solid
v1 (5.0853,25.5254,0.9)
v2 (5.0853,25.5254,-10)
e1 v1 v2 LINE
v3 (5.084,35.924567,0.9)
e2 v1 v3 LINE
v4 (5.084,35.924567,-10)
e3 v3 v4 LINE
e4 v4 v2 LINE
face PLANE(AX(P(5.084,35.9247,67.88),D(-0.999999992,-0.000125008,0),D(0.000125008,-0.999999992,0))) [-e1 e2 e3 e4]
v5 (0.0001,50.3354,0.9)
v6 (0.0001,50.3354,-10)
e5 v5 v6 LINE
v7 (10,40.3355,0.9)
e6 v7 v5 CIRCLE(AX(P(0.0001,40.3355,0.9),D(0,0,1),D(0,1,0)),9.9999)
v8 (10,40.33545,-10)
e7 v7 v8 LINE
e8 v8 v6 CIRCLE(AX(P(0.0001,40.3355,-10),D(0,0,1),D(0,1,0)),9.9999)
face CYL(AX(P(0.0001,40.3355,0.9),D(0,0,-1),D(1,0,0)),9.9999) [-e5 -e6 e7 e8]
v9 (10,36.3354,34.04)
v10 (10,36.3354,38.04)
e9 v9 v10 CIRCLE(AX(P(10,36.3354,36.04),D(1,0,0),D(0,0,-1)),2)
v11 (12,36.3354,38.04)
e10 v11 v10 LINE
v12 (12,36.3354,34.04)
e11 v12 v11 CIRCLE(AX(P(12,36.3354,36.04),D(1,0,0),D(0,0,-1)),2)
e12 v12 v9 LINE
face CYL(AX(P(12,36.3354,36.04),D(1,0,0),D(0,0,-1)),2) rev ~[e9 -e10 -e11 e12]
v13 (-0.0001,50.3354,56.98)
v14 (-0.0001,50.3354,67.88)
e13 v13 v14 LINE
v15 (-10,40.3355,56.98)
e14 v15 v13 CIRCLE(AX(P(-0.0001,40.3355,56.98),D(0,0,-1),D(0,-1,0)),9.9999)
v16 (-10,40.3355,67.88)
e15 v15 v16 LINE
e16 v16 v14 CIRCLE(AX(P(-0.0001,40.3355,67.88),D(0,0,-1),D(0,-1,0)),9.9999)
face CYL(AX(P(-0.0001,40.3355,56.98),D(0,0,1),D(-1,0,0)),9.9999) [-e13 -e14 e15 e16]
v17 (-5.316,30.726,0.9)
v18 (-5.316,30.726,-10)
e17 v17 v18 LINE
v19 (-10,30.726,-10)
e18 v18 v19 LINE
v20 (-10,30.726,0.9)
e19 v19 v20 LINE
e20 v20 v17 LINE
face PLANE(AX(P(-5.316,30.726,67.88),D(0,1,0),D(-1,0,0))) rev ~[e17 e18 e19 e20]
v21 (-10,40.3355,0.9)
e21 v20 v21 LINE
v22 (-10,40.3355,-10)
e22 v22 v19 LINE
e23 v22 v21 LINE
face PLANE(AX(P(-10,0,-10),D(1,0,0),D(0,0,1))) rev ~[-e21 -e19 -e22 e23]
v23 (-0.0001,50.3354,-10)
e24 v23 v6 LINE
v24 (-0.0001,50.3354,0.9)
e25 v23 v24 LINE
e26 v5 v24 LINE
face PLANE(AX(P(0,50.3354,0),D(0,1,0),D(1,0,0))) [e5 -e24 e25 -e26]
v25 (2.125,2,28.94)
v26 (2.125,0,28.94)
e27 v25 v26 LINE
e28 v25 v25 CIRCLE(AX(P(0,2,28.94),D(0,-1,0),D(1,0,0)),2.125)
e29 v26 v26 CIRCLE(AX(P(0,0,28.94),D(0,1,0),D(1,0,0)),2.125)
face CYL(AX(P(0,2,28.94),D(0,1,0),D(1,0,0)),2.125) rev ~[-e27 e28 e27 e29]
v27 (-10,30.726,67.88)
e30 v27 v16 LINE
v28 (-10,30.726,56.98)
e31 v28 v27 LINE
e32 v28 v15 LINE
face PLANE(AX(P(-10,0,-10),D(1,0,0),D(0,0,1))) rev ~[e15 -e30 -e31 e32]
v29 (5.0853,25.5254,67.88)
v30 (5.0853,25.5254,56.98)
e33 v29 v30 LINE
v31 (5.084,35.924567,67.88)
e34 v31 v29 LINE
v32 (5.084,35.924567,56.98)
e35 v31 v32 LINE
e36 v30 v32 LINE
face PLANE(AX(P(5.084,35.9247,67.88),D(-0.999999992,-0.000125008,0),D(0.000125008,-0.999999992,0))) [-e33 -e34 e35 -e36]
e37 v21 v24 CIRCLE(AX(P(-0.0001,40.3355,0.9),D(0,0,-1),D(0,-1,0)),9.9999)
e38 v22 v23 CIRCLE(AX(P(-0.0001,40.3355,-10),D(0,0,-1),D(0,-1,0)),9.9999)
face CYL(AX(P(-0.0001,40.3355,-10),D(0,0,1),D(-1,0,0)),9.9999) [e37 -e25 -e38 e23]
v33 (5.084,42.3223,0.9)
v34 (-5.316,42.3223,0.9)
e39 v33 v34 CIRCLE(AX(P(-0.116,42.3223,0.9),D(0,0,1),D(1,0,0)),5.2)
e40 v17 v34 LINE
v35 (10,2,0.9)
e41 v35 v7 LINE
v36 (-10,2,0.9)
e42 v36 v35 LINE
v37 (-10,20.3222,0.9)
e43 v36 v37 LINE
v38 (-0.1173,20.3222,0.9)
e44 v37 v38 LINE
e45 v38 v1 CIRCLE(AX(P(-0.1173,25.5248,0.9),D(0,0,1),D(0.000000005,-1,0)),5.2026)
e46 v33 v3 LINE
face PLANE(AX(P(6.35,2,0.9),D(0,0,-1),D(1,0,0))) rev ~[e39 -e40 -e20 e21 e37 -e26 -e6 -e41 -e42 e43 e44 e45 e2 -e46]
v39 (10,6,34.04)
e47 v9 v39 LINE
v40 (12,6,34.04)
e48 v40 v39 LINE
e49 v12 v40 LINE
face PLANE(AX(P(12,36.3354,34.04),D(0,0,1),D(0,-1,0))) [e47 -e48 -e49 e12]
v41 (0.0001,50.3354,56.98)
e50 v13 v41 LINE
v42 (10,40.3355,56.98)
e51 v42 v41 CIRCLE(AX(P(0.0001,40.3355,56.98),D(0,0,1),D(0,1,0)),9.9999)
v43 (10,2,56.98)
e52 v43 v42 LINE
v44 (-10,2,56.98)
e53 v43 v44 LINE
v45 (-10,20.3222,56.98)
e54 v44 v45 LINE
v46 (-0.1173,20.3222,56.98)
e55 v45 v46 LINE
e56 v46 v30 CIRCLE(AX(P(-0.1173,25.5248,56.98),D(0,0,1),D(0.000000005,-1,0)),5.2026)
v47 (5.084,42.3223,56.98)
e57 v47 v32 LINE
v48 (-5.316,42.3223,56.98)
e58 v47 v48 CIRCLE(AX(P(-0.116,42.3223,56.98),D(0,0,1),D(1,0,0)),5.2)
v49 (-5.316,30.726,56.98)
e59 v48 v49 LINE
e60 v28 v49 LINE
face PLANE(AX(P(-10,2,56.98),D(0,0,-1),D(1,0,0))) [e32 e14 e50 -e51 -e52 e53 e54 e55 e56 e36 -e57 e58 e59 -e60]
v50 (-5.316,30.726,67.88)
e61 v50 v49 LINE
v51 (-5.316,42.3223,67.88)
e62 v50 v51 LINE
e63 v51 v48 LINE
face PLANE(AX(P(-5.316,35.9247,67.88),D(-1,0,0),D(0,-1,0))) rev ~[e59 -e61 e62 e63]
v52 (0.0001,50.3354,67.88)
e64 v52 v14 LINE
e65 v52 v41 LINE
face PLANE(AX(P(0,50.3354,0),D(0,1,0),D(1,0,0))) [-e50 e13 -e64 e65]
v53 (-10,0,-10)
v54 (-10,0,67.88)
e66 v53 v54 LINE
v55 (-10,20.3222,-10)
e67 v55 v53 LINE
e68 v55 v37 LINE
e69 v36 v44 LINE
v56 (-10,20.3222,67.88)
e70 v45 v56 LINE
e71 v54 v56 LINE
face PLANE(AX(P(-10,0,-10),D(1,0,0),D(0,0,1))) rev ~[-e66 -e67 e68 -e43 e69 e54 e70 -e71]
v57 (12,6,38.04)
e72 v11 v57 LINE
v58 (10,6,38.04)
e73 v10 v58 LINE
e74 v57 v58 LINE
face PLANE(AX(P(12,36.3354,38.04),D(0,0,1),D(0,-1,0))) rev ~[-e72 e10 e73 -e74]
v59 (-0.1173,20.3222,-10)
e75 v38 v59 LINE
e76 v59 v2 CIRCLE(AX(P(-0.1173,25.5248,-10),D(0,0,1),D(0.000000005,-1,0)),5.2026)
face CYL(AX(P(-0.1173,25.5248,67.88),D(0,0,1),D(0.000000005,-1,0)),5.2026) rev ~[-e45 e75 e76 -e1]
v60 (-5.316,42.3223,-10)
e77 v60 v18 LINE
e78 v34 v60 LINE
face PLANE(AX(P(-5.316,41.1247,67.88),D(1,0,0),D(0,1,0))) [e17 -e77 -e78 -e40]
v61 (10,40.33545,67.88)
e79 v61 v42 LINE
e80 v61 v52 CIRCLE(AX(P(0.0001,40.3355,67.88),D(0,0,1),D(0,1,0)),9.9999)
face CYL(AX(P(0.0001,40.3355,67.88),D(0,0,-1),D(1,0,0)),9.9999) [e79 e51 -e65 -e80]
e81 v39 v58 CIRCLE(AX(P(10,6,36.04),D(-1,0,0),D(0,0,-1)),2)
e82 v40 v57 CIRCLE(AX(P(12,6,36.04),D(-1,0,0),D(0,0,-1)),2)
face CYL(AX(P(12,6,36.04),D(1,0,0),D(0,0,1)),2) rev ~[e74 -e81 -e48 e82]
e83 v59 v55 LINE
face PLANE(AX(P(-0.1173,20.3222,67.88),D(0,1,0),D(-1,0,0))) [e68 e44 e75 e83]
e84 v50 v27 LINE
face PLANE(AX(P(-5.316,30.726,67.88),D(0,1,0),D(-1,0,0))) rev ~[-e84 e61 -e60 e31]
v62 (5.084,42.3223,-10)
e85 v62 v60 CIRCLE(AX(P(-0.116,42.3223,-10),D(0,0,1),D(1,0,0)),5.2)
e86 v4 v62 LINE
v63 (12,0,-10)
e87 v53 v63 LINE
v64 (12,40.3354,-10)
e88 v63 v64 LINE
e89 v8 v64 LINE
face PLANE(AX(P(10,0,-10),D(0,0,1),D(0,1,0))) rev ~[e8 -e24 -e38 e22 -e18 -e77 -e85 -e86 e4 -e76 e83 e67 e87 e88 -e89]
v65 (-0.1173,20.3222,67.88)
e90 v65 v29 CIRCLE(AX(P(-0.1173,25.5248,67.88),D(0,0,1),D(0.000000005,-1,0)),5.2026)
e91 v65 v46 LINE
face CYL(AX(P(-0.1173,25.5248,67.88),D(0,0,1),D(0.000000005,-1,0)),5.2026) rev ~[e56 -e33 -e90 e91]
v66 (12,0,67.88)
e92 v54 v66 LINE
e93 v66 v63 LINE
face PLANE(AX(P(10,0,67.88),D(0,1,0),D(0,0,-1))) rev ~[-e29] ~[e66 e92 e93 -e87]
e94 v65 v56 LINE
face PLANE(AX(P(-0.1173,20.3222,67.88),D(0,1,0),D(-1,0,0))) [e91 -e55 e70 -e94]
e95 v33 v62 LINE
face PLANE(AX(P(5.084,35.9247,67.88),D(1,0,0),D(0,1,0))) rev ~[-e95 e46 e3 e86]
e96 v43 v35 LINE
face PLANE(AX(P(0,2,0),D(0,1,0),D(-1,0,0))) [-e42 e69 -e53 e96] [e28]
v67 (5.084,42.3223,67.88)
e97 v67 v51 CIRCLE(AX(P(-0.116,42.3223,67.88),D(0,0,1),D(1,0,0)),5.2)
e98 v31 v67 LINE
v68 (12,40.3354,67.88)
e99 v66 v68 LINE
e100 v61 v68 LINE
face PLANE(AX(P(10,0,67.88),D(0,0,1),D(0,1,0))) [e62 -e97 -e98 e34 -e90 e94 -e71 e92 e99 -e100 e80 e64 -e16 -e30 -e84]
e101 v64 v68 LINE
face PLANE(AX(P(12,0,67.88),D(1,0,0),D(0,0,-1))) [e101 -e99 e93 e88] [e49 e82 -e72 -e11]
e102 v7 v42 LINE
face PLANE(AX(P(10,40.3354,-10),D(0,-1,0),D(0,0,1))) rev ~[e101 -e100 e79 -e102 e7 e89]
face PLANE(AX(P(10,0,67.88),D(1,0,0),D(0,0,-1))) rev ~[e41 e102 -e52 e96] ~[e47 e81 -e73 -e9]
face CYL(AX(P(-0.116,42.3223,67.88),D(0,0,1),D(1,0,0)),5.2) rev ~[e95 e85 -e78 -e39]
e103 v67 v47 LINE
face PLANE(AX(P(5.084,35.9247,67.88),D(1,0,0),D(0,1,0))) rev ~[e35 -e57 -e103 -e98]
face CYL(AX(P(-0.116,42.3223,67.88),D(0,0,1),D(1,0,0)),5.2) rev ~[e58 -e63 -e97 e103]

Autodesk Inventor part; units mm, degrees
ref_plane "YZ Plane" through (0, 0, 0) normal (1, 0, 0) x (0, 1, 0)
ref_plane "XZ Plane" through (0, 0, 0) normal (0, 1, 0) x (-1, 0, 0)
ref_plane "XY Plane" through (0, 0, 0) normal (0, 0, 1) x (1, 0, 0)
sketch "Sketch1" plane through (0, 0, 0) normal (0, 1, 0) x (-1, 0, 0)
  line L0 (10, 67.88) -> (-10, 67.88)
  line L1 (-10, 67.88) -> (-10, -10)
  line L2 (-10, -10) -> (10, -10)
  line L3 (10, -10) -> (10, 67.88)
  point P0 (0, 0)
  dimension "d0" = 20
  dimension "d1" = 77.88
extrude "Extrusion1" add sketch "Sketch1" along normal blind 2
sketch "Sketch2" plane through (0, 2, 0) normal (0, 1, 0) x (1, 0, 0)
  line L0 (-10, -67.88) -> (10, -67.88) projected
  line L1 (0, -67.88) -> (-6.35, -67.88)
  line L2 (-6.35, -56.98) -> (6.35, -56.98)
  line L3 (6.35, -67.88) -> (0, -67.88)
  line L4 (10, 10) -> (-10, 10) projected
  line L5 (-6.35, -0.9) -> (6.35, -0.9)
  line L6 (-6.35, 10) -> (6.35, 10)
  line L7 (-6.35, -67.88) -> (-10, -67.88)
  line L8 (-10, 10) -> (-10, -67.88) projected
  line L9 (-10, -56.98) -> (-6.35, -56.98)
  line L10 (6.35, -67.88) -> (10, -67.88)
  line L11 (10, -67.88) -> (10, 10) projected
  line L12 (10, -56.98) -> (6.35, -56.98)
  line L13 (6.35, -0.9) -> (10, -0.9)
  line L14 (10, 10) -> (6.35, 10)
  line L15 (10, -0.9) -> (10, 10)
  line L16 (10, -67.88) -> (10, -56.98)
  line L17 (-10, -67.88) -> (-10, -56.98)
  line L18 (-6.35, -0.9) -> (-10, -0.9)
  line L19 (-10, -0.9) -> (-10, 10)
  line L20 (-10, 10) -> (-6.35, 10)
  point P0 (0, 0)
  dimension "d4" = 6.35
  dimension "d5" = 10.9
  dimension "d6" = 12.7
  dimension "d7" = 10.9
extrude "Extrusion2" add sketch "Sketch2" along normal blind 48.3354 contours L8 L9 L2 L12 L11 L0 | L8 L4 L11 L13 L5 L18
sketch "Sketch9" plane through (-10, 0, 67.88) normal (0, 0, 1) x (1, 0, 0)
  arc A0 (15.084, 42.3223) -> (4.684, 42.3223) centre (9.884, 42.3223) ccw
  line L0 (15.084, 35.9247) -> (15.084, 42.3223)
  line L1 (4.684, 41.1247) -> (4.684, 42.3223)
  arc A1 (15.084, 42.3223) -> (4.684, 42.3223) centre (9.884, 42.3223) ccw
  line L2 (4.684, 42.3223) -> (4.684, 35.9247)
  line L3 (9.8827, 20.3222) -> (-0.0013, 20.3222)
  line L4 (-0.0013, 30.726) -> (-0.0013, 20.3222)
  line L5 (4.684, 35.9247) -> (4.684, 30.726)
  line L6 (15.084, 35.9247) -> (15.0853, 25.5254)
  arc A2 (15.084, 35.9247) -> (15.084, 35.9251) centre (9.884, 35.9243) ccw
  line L7 (4.684, 30.726) -> (-0.0013, 30.726)
  arc A3 (9.8827, 20.3222) -> (15.0853, 25.5254) centre (9.8827, 25.5248) ccw
  point P0 (10, 0)
fillet "Fillet4" radius 10 4 edges at (10, 50.3354, 62.43) (-10, 50.3354, 62.43) (-10, 50.3354, -4.55) (10, 50.3354, -4.55)
sketch "Sketch10" plane through (0, 2, 0) normal (0, 1, 0) x (1, 0, 0)
  line L0 (10, -67.88) -> (-10, -67.88) projected
  line L1 (-10, 10) -> (10, 10) projected
  line L2 (10, -56.98) -> (10, -0.9) projected
  line L3 (-10, -0.9) -> (-10, -56.98) projected
  line L4 (10, -28.94) -> (-10, -28.94)
  circle A0 centre (0, -28.94) radius 2.125
  point P0 (0, 0)
  dimension "d53" = 77.88
  dimension "d54" = 4.25
extrude "Extrusion10" cut sketch "Sketch10" against normal blind 2
extrude "Extrusion11" cut sketch "Sketch9" against normal through all
sketch "Sketch11" plane through (10, 0, 67.88) normal (1, 0, 0) x (0, 0, -1)
  line L0 (0, 0) -> (0, 20.3222) projected
  line L1 (77.88, 30.726) -> (77.88, 40.3354) projected
  line L2 (0, 0) -> (77.88, 0)
  line L3 (77.88, 0) -> (77.88, 40.3354)
  line L4 (77.88, 40.3354) -> (0, 40.3354)
  line L5 (0, 40.3354) -> (0, 0)
  point P0 (67.88, 0)
extrude "Extrusion12" add sketch "Sketch11" along normal blind 2
sketch "Sketch12" plane through (12, 0, 67.88) normal (1, 0, 0) x (0, 0, -1)
  line L0 (10.9, 40.3354) -> (0, 40.3354) projected
  line L1 (77.88, 30.726) -> (77.88, 40.3354) projected
  line L2 (0, 40.3354) -> (77.88, 40.3354)
  line L3 (77.88, 40.3354) -> (0, 40.3354) projected
  line L4 (38.94, 40.3354) -> (64.34, 40.3354)
  line L5 (38.94, 40.3354) -> (13.54, 40.3354)
  line L6 (77.88, 0) -> (0, 0) projected
  line L7 (13.54, 40.3354) -> (64.34, 40.3354)
  line L8 (64.34, 40.3354) -> (64.34, 0)
  line L9 (64.34, 0) -> (13.54, 0)
  line L10 (13.54, 0) -> (13.54, 40.3354)
  line L11 (13.54, 0) -> (31.84, 0)
  line L12 (31.84, 0) -> (31.84, 6)
  arc A0 (33.84, 36.3354) -> (29.84, 36.3354) centre (31.84, 36.3354) ccw
  arc A1 (29.84, 6) -> (33.84, 6) centre (31.84, 6) ccw
  line L13 (29.84, 36.3354) -> (29.84, 6)
  line L14 (33.84, 36.3354) -> (33.84, 6)
  line L15 (31.84, 36.3354) -> (13.54, 36.3354)
  point P0 (67.88, 0)
  dimension "d65" = 25.4
  dimension "d66" = 25.4
  dimension "d67" = 50.8
  dimension "d68" = 18.3
  dimension "d69" = 6
  dimension "d71" = 4
  dimension "d72" = 4
  dimension "d75" = 18.3
extrude "Extrusion13" cut sketch "Sketch12" against normal blind 2 contours A0 L14 A1 L13
properties part number "6 Backet Adjustment 2.0"
